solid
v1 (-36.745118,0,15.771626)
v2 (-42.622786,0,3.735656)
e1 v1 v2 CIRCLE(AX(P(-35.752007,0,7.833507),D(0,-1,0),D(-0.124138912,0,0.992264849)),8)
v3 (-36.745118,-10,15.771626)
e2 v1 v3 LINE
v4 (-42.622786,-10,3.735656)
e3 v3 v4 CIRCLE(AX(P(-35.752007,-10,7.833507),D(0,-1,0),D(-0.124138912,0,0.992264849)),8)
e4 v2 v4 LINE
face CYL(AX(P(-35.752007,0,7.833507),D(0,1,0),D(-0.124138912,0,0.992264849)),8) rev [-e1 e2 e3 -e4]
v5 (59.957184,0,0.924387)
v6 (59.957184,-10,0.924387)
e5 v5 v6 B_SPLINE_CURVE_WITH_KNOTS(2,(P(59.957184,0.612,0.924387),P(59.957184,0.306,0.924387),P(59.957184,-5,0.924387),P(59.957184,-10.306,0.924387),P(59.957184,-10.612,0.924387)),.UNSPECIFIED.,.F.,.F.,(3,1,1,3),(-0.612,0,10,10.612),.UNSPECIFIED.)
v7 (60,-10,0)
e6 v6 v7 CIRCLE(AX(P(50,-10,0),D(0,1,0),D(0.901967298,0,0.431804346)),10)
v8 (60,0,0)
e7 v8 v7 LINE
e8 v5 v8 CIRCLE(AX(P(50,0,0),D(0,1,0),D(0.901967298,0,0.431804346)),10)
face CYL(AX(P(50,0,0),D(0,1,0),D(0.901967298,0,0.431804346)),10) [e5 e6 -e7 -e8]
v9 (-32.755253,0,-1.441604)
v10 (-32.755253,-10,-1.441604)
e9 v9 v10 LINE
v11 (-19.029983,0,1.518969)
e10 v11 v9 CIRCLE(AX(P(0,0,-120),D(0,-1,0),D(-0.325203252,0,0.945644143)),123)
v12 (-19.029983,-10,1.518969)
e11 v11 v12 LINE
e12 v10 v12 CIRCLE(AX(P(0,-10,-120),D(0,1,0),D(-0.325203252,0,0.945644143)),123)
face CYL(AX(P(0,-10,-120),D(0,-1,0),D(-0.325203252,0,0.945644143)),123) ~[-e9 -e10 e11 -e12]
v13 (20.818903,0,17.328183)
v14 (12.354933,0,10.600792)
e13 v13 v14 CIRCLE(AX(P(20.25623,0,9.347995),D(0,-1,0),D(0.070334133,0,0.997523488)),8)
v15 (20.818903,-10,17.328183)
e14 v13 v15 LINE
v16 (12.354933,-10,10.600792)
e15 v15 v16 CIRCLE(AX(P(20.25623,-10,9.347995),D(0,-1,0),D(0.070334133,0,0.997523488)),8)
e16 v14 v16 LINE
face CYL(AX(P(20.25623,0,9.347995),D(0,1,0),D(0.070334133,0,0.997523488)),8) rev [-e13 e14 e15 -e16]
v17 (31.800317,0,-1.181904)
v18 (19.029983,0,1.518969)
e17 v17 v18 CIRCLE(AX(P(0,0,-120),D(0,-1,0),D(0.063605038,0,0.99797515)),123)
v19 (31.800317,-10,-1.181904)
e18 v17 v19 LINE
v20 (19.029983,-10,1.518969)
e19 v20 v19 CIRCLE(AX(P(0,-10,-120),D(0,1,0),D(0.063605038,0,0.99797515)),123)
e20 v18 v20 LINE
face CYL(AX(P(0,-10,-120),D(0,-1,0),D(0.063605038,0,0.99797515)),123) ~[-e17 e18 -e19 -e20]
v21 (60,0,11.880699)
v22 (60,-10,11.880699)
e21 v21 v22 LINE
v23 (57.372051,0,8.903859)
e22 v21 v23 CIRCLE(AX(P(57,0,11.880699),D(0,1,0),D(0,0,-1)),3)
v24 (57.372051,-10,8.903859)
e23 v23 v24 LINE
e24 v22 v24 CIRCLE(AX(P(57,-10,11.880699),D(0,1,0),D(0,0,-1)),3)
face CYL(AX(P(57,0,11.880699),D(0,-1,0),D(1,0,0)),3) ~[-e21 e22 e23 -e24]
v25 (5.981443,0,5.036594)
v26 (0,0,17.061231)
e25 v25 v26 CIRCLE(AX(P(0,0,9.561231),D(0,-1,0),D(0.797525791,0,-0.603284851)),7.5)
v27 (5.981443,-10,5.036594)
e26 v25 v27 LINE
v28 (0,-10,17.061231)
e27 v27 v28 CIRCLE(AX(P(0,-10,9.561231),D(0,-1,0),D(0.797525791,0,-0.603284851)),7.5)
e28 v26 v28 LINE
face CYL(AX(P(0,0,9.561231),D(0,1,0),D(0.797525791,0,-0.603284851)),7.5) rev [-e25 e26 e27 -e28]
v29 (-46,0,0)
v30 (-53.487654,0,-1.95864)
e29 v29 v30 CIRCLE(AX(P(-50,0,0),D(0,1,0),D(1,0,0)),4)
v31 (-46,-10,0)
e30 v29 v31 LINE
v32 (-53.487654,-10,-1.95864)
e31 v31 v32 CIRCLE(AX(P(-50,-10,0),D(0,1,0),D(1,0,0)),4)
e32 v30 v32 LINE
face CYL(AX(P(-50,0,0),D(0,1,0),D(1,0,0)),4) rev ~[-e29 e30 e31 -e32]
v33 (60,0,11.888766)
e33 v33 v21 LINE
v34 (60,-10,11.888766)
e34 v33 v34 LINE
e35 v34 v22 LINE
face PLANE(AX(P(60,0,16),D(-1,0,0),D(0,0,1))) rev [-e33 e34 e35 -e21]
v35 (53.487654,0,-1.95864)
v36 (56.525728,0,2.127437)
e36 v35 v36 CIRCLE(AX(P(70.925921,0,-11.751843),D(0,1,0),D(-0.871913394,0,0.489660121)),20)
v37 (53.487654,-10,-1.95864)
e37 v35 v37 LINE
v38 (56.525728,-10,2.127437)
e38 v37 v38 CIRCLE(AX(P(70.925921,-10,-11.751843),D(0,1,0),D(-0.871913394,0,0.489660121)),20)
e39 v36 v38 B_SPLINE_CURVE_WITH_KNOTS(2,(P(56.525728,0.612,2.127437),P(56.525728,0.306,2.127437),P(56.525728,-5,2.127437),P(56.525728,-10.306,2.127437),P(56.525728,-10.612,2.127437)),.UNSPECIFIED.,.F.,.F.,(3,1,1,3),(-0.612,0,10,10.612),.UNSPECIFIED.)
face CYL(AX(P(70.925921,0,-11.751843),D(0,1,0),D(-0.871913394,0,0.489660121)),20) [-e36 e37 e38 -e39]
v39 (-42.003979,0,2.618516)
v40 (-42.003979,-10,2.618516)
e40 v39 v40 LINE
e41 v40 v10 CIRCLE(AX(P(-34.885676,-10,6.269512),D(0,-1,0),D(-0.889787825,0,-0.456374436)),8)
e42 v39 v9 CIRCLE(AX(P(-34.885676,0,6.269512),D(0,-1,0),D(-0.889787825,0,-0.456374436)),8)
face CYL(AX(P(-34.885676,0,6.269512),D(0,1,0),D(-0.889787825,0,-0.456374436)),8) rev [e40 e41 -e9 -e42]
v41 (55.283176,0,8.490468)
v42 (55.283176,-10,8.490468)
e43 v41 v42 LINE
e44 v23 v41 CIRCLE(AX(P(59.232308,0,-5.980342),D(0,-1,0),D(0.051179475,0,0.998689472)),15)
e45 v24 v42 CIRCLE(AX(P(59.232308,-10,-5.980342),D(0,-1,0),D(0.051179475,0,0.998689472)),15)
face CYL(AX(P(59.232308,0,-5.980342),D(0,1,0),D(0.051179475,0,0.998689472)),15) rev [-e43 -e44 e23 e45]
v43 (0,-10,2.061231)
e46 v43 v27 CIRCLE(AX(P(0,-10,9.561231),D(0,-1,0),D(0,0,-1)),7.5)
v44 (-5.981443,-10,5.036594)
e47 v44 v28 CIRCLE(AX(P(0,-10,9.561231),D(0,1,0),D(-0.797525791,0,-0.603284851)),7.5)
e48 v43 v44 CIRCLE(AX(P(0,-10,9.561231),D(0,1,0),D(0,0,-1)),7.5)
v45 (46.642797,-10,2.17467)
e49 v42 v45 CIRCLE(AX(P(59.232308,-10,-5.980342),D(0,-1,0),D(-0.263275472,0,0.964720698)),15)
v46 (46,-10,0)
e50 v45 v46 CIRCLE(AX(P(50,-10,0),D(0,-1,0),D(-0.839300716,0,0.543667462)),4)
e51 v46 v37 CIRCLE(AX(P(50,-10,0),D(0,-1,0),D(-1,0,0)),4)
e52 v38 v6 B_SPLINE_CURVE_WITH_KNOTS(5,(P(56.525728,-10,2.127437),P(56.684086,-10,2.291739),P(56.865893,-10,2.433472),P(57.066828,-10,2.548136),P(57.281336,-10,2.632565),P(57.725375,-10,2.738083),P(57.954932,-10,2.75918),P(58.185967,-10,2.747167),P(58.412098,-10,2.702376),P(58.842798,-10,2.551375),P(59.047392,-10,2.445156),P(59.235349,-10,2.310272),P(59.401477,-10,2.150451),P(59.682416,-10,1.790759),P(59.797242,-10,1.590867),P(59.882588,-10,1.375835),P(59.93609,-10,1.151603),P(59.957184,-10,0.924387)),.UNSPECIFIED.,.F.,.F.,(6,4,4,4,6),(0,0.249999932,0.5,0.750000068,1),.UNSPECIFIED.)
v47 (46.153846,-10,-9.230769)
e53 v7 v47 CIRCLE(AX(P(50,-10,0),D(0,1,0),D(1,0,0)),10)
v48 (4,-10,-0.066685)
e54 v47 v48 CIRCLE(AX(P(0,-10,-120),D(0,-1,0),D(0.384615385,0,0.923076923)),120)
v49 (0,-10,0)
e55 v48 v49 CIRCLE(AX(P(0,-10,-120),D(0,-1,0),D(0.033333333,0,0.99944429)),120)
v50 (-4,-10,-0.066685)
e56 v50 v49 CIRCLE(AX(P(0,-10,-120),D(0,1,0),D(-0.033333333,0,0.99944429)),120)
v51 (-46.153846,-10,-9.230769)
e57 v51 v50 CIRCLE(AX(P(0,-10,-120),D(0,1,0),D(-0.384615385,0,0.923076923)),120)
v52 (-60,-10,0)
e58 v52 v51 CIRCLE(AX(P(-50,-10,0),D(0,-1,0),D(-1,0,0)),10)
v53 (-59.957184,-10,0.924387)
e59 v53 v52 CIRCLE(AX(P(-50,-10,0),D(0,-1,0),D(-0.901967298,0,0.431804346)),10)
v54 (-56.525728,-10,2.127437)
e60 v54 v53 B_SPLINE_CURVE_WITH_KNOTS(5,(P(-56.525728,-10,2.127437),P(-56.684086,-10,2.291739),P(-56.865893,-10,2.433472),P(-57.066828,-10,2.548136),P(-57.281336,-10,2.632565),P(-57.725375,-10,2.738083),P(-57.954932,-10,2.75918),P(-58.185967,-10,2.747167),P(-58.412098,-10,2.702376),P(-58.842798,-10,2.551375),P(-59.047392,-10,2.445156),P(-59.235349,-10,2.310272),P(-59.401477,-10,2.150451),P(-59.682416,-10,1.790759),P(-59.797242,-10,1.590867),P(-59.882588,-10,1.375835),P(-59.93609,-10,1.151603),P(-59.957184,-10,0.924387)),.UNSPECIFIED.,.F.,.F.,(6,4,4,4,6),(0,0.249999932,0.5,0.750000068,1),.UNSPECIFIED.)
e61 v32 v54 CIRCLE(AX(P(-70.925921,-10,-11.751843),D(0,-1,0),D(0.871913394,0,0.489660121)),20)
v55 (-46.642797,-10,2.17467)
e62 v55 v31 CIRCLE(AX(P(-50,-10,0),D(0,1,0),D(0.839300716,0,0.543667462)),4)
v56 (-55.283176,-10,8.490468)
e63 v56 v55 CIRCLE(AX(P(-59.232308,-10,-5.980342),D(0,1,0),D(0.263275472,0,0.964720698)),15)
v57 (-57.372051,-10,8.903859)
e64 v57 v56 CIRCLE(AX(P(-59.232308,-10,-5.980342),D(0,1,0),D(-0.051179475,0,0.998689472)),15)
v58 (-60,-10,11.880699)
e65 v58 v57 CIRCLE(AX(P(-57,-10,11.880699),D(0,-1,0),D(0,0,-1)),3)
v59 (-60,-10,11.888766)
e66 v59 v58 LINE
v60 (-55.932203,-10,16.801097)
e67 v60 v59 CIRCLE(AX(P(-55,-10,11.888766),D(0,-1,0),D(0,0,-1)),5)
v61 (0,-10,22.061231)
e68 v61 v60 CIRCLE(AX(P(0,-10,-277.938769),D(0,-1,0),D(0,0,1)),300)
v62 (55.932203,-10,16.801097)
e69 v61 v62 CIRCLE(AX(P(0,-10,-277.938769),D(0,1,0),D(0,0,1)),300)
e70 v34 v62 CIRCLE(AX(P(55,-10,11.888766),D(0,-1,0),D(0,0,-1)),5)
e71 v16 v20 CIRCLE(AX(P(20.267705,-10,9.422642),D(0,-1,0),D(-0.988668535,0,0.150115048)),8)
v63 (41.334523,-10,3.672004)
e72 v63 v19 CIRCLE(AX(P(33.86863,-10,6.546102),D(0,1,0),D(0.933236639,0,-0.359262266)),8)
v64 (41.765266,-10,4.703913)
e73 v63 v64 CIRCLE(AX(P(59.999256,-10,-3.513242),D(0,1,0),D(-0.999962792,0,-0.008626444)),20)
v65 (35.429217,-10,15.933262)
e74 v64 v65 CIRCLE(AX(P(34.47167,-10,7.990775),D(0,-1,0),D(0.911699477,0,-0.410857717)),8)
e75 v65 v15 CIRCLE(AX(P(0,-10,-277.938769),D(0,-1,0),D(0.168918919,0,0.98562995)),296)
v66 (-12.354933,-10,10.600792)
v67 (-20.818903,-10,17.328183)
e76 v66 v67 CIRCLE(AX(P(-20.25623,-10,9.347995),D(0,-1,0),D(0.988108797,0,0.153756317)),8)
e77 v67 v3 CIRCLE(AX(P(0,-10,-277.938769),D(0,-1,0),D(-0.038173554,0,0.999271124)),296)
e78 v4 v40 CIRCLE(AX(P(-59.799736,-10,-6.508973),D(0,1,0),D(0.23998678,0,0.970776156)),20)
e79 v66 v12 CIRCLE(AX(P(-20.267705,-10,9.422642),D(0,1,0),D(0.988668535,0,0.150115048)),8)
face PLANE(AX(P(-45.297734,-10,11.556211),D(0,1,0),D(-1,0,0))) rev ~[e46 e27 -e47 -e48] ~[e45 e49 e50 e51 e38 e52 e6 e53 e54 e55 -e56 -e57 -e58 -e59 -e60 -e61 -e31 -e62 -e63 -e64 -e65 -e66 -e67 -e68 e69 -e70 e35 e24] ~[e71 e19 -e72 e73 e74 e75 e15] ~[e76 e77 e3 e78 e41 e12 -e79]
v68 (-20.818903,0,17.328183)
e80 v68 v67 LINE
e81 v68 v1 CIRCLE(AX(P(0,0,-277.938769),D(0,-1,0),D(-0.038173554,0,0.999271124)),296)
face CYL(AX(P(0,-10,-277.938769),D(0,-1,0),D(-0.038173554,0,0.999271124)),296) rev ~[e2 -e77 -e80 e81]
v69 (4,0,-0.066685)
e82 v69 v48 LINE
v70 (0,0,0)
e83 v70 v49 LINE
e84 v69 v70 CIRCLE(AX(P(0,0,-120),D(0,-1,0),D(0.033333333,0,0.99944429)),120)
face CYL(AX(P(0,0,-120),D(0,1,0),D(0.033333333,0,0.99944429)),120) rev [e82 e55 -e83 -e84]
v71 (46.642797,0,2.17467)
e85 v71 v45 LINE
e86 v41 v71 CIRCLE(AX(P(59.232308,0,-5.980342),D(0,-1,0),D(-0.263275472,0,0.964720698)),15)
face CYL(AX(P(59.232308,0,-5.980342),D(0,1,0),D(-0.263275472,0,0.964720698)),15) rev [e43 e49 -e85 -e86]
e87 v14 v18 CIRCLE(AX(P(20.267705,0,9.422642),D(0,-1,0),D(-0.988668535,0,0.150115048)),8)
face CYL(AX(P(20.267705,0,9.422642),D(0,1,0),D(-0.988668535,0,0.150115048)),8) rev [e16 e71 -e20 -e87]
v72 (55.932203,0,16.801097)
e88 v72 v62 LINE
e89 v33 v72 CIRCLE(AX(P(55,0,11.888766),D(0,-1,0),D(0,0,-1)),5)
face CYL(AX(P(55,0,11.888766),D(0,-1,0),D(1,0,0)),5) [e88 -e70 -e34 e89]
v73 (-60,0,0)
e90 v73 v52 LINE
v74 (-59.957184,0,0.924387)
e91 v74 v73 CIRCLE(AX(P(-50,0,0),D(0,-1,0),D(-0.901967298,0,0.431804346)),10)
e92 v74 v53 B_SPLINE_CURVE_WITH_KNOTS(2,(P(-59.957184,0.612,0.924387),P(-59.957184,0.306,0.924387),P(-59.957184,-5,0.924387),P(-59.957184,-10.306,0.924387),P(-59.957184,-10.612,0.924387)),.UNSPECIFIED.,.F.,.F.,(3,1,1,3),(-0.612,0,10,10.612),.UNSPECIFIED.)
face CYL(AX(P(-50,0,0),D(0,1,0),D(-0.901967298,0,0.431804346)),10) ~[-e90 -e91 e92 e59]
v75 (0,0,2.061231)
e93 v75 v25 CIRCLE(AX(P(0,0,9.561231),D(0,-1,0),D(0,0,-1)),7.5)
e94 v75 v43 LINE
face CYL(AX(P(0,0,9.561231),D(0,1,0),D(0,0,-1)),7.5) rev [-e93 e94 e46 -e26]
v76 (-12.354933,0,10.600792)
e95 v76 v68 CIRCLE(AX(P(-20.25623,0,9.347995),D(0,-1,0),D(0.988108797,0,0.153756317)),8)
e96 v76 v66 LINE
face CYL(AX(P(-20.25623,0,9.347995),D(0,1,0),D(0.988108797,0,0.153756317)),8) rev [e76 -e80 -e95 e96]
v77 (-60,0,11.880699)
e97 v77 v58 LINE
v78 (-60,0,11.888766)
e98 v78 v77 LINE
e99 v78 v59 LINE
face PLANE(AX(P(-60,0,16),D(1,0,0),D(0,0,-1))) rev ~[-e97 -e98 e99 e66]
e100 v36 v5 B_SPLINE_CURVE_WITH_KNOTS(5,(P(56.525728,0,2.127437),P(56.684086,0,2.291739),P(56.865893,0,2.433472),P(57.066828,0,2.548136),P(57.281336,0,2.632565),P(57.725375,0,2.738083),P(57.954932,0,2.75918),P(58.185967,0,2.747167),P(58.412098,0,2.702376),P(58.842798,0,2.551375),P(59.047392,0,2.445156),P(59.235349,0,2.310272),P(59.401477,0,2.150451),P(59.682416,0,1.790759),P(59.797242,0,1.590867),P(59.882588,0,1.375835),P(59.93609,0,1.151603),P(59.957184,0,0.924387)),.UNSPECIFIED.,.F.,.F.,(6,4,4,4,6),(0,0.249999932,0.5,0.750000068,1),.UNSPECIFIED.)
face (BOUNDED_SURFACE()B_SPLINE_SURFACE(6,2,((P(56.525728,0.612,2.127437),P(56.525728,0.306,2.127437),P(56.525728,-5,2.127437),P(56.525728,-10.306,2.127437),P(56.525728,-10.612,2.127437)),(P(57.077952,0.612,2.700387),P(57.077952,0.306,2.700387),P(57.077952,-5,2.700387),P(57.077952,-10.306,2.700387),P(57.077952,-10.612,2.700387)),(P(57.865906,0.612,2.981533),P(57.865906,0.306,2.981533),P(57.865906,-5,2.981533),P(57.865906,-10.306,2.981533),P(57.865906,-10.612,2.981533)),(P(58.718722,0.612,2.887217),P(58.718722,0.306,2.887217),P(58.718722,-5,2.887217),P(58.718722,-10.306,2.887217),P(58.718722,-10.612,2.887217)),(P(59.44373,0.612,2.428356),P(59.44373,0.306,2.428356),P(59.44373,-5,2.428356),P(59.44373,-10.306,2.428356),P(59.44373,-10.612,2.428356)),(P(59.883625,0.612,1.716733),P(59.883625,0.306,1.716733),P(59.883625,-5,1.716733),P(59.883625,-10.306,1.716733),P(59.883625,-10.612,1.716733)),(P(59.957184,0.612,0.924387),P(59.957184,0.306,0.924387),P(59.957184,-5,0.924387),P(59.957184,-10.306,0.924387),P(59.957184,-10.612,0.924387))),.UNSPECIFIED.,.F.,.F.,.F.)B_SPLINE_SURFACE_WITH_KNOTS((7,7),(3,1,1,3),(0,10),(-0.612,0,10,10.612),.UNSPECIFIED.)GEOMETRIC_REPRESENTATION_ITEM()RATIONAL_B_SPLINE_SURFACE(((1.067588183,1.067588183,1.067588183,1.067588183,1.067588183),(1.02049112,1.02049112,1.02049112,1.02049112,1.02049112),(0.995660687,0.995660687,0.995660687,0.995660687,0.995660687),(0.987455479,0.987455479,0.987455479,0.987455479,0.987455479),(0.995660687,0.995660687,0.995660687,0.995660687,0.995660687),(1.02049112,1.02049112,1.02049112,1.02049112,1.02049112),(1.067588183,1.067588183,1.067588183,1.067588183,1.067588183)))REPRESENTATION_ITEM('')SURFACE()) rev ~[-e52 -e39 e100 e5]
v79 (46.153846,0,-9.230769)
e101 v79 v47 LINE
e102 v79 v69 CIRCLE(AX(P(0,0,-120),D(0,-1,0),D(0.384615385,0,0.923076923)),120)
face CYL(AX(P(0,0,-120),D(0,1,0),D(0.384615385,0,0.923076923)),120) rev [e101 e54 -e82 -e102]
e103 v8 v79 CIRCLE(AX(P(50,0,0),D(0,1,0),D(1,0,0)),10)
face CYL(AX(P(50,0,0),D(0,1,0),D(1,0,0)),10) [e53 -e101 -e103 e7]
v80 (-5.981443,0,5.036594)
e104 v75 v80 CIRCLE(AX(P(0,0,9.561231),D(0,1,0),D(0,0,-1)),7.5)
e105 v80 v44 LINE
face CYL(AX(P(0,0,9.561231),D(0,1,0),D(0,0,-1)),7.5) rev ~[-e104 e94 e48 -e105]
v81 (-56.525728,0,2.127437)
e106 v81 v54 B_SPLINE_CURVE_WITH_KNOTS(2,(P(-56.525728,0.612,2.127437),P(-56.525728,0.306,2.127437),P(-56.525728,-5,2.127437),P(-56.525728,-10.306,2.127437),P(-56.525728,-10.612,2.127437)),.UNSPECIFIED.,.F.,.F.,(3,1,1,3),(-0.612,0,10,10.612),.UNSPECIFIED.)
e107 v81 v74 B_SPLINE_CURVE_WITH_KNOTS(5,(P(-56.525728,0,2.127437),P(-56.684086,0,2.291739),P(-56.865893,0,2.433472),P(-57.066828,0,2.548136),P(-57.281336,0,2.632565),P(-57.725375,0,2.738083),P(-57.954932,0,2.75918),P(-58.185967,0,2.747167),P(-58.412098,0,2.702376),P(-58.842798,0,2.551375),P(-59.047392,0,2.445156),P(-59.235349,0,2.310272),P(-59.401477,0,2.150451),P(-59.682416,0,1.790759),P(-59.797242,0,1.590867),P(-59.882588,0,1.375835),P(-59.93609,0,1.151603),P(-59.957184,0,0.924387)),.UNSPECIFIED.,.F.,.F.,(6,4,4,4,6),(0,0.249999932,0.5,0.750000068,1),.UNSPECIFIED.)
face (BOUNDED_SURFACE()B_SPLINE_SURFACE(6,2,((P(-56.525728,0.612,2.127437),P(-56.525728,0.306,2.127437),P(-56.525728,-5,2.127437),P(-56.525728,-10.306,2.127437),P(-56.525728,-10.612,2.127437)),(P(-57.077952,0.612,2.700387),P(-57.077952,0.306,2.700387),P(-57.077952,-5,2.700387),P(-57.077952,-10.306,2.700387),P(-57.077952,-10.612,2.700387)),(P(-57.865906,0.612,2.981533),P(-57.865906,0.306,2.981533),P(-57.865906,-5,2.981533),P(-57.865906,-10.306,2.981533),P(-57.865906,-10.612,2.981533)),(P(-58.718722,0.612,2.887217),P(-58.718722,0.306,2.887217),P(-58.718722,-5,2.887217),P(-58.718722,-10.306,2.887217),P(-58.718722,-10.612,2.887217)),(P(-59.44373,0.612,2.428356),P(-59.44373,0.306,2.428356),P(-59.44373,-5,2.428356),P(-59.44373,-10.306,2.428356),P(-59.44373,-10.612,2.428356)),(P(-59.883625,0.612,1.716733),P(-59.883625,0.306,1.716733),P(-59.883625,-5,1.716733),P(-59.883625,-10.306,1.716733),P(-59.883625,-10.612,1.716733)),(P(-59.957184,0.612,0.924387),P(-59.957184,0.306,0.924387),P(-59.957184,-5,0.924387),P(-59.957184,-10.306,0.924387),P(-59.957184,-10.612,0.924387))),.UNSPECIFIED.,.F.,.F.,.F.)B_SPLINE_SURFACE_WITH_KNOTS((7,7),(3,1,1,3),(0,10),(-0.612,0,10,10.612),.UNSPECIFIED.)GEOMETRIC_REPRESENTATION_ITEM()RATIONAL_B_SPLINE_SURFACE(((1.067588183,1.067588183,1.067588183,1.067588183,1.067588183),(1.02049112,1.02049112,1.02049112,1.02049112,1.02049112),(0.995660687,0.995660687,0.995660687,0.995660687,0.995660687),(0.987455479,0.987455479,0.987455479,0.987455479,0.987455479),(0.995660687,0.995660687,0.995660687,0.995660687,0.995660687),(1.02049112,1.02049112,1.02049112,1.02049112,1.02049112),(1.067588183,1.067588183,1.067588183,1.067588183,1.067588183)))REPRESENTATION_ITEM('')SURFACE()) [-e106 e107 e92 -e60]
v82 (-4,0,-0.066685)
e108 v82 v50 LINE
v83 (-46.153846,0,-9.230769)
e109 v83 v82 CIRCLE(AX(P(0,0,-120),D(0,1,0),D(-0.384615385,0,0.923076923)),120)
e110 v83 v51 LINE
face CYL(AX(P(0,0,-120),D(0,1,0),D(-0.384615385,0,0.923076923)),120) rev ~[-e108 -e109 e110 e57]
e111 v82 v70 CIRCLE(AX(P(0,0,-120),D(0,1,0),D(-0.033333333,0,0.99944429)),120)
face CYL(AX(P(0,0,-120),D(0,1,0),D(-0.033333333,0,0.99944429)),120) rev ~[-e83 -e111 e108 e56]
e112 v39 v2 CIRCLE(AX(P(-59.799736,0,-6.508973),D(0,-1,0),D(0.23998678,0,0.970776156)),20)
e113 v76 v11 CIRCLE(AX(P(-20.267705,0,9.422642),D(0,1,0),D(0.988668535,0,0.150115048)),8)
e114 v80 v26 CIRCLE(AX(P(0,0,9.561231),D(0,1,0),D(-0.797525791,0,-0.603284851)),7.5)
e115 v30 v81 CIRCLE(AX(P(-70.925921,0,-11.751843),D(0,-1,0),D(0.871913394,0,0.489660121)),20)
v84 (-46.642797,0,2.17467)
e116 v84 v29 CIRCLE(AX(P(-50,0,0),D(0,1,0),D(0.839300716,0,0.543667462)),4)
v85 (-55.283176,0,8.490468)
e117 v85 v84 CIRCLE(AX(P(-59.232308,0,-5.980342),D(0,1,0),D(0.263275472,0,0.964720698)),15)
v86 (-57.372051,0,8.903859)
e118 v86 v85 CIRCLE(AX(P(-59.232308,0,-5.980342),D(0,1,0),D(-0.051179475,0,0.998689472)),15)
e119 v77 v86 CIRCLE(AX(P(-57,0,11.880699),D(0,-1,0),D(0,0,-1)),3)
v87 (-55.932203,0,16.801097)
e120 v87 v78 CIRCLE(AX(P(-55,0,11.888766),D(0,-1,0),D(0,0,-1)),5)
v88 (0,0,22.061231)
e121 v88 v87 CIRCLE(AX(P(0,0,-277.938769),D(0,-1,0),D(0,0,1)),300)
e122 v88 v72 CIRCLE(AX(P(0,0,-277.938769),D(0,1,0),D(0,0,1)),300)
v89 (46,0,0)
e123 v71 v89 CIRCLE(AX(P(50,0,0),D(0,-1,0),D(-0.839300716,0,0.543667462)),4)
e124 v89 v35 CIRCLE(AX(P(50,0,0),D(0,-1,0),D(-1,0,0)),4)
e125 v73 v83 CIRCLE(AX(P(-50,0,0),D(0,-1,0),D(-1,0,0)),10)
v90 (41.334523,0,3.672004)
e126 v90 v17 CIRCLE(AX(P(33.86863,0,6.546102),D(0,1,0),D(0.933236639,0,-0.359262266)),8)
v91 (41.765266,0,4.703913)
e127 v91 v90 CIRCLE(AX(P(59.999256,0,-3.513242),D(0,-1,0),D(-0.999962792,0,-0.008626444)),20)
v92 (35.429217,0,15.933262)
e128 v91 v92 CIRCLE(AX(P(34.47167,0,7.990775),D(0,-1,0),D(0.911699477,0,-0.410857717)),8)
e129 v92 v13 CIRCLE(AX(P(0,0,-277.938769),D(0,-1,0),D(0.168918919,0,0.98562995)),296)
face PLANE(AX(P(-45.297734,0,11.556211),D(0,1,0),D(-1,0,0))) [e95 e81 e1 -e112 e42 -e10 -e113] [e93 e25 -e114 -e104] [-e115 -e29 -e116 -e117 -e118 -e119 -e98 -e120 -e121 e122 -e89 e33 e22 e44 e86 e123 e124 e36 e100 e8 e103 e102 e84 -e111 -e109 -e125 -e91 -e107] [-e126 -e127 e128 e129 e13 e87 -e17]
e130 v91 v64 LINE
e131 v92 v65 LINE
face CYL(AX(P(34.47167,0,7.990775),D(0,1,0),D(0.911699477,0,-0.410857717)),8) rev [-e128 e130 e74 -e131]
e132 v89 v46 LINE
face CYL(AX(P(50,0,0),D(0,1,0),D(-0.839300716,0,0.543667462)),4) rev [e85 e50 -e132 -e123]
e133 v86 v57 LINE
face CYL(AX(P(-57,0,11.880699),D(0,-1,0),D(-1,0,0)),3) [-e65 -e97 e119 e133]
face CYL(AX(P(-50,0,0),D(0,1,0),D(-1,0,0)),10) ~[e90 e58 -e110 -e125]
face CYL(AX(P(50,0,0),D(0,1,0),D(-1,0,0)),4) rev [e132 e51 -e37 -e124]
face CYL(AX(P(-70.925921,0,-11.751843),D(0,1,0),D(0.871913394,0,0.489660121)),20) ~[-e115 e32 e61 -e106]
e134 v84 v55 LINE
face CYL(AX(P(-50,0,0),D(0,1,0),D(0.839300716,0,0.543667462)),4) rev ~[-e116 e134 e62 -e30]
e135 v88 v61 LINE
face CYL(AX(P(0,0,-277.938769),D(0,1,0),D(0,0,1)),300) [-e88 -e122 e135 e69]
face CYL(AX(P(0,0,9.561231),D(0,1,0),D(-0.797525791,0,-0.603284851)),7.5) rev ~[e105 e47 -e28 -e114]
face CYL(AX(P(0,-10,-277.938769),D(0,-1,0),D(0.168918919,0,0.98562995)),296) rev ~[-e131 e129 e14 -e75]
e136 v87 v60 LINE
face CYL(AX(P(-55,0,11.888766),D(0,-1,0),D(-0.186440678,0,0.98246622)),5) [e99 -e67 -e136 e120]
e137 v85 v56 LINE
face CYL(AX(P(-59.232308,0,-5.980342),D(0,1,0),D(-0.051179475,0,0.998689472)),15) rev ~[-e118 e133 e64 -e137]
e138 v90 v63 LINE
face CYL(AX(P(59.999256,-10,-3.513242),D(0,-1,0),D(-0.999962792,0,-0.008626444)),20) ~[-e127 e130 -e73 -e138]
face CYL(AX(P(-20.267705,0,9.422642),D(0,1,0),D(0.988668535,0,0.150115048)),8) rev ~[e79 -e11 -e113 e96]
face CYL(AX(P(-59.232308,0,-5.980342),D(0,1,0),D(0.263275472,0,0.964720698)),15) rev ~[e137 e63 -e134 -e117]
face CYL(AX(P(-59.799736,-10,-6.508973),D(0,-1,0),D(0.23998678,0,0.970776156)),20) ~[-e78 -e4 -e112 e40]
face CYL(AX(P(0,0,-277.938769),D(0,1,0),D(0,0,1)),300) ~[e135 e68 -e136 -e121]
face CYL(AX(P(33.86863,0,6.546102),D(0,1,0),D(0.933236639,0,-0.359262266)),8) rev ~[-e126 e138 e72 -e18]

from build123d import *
from build123d import SkipClean  # not in build123d's __all__

# Parameters (mm, degrees)
F1_DEPTH    = 10
F3_R        = 5
F4_R        = 3
F5_R        = 2
F7_DEPTH    = 10.0010001
F8_T1_DEPTH = 10


# Not quite as in the source:
# - a fillet or chamfer that OpenCascade refuses, or shapes differently, is made with other operations: its cross-section is extruded or revolved along the edge and cut away or added


with BuildPart() as f1:
    # F0 (on Front) → F1 (new body)
    with BuildSketch(Plane.XZ):
        with BuildLine():
            ThreePointArc((-60, 9), (-57.6213157363, 8.9328971517), (-55.2831757887, 8.4904683961))
            ThreePointArc((-55.2831757887, 8.4904683961), (-45.1436514688, 8.7416176388), (-40, 0))
            ThreePointArc((-40, 0), (-41.6794970566, -5.5470019623), (-46.1538461538, -9.2307692308))
            ThreePointArc((-46.1538461538, -9.2307692308), (-25.4921003461, -2.7389543798), (-4, -0.0666851955))
            ThreePointArc((-4, -0.0666851955), (-4.6347028183, 2.6231856146), (-5.9814434357, 5.03659448))
            ThreePointArc((-5.9814434357, 5.03659448), (-6.715086481, 12.9015322824), (0, 17.061230866))
            Line((0, 17.061230866), (0, 22.061230866))
            ThreePointArc((0, 22.061230866), (-30.1526886016, 20.5420767676), (-60, 16))
            Line((-60, 16), (-60, 9))
        make_face()
        with BuildLine():
            ThreePointArc((-46.6427971379, 2.1746698468), (-46.1640639051, 1.1338404984), (-46, 0))
            ThreePointArc((-46, 0), (-48.9877288652, -3.8697941999), (-53.4876535749, -1.958640483))
            ThreePointArc((-53.4876535749, -1.958640483), (-55.921777017, 1.4722128283), (-59.0196729824, 4.3180434563))
            ThreePointArc((-59.0196729824, 4.3180434563), (-59.7518390528, 2.21396366), (-60, 0))
            ThreePointArc((-60, 0), (-55.5470019623, -8.3205029434), (-46.1538461538, -9.2307692308))
            ThreePointArc((-46.1538461538, -9.2307692308), (-41.6794970566, -5.5470019623), (-40, 0))
            ThreePointArc((-40, 0), (-45.1436514688, 8.7416176388), (-55.2831757887, 8.4904683961))
            ThreePointArc((-55.2831757887, 8.4904683961), (-50.3805281419, 6.1294058803), (-46.6427971379, 2.1746698468))
        make_face()
        with BuildLine():
            ThreePointArc((-5.9814434357, 5.03659448), (-4.6347028183, 2.6231856146), (-4, -0.0666851955))
            ThreePointArc((-4, -0.0666851955), (-2.0002779129, -0.0166724571), (0, 0))
            Line((0, 0), (0, 2.061230866))
            ThreePointArc((0, 2.061230866), (-3.3403014164, 2.846144385), (-5.9814434357, 5.03659448))
        make_face()
    extrude(amount=F1_DEPTH)

    # F2: F1 across plane


with BuildPart() as f1_1:
    add(f1.part, clean=False)
    with SkipClean():  # cleaning this boolean's faces spoils the solid; the shape is the same uncleaned
        add(f1.part.mirror(Plane.YZ), clean=False)

    # F3
    f3_edges = [f1_1.edges().sort_by_distance(p)[0] for p in [
        (-60, -5, 16),
        (60, -5, 16),
    ]]
    fillet(f3_edges, radius=F3_R)

    # F4
    f4_edges = [f1_1.edges().sort_by_distance(p)[0] for p in [
        (-60, -5, 9),
        (60, -5, 9),
    ]]
    fillet(f4_edges, radius=F4_R)

    # F5
    f5_edges = [f1_1.edges().sort_by_distance(p)[0] for p in [
        (-59.019673, -5, 4.318043),
        (59.019673, -5, 4.318043),
    ]]
    fillet(f5_edges, radius=F5_R)

    # F6 (on face) → F7 (cut, through all)
    with BuildSketch(Plane.XZ.offset(10)):
        with BuildLine():
            ThreePointArc((-7.8234196702, 2.7509433962), (-12.1811976175, 9.6949287705), (-11.2993718648, 17.8454836508))
            ThreePointArc((-11.2993718648, 17.8454836508), (-33.2415394106, 16.1887543276), (-55, 12.9065505808))
            ThreePointArc((-55, 12.9065505808), (-44.9636385736, 6.903343626), (-40, -3.685770432))
            ThreePointArc((-40, -3.685770432), (-24.1273224471, 0.6104154355), (-7.8234196702, 2.7509433962))
        make_face()
        with BuildLine():
            ThreePointArc((40, -3.685770432), (42.6359894717, 6.412330531), (50, 13.8076961402))
            ThreePointArc((50, 13.8076961402), (30.7161061945, 16.4632023612), (11.2993718648, 17.8454836508))
            ThreePointArc((11.2993718648, 17.8454836508), (12.1961499726, 15.2393294517), (12.5, 12.5))
            ThreePointArc((12.5, 12.5), (11.2703759005, 7.0936493768), (7.8234196702, 2.7509433962))
            ThreePointArc((7.8234196702, 2.7509433962), (24.1273224471, 0.6104154355), (40, -3.685770432))
        make_face()
    extrude(amount=-F7_DEPTH, mode=Mode.SUBTRACT)

    # F8: fillet of radius 8 on 8 edges, made by hand

    # F8_s2 → F8_t1 (join)
    with BuildSketch(Plane.XZ):
        with BuildLine():
            ThreePointArc((-36.7451179027, 15.7716261712), (-42.9406323526, 11.3440144515), (-42.6227863201, 3.7356559729))
            ThreePointArc((-42.6227863201, 3.7356559729), (-47.8930149535, 9.5605639606), (-55, 12.9065505808))
            ThreePointArc((-55, 12.9065505808), (-45.8949216066, 14.4815724477), (-36.7451179027, 15.7716261712))
        make_face()
        with BuildLine():
            ThreePointArc((-42.0039790926, 2.6185161763), (-38.1014001727, -1.0557269801), (-32.7552534978, -1.4416035521))
            ThreePointArc((-32.7552534978, -1.4416035521), (-36.3949282061, -2.5078334489), (-40, -3.685770432))
            ThreePointArc((-40, -3.685770432), (-40.7395345489, -0.4501990795), (-42.0039790926, 2.6185161763))
        make_face()
        with BuildLine():
            ThreePointArc((-12.3583566886, 10.623561896), (-13.8147498473, 4.6940719377), (-19.0299825284, 1.5189687455))
            ThreePointArc((-19.0299825284, 1.5189687455), (-13.4408237395, 2.2634215831), (-7.8234196702, 2.7509433962))
            ThreePointArc((-7.8234196702, 2.7509433962), (-10.83146134, 6.2606534605), (-12.3583566886, 10.623561896))
        make_face()
        with BuildLine():
            ThreePointArc((-12.3513599638, 10.578046035), (-15.2694424, 15.6035487131), (-20.8189034057, 17.3281834039))
            ThreePointArc((-20.8189034057, 17.3281834039), (-16.0612204229, 17.6251616805), (-11.2993718648, 17.8454836508))
            ThreePointArc((-11.2993718648, 17.8454836508), (-12.3710626618, 14.2907564373), (-12.3513599638, 10.578046035))
        make_face()
        with BuildLine():
            ThreePointArc((20.8189034057, 17.3281834039), (15.2694424, 15.6035487131), (12.3513599638, 10.578046035))
            ThreePointArc((12.3513599638, 10.578046035), (12.3710626618, 14.2907564373), (11.2993718648, 17.8454836508))
            ThreePointArc((11.2993718648, 17.8454836508), (16.0612204229, 17.6251616805), (20.8189034057, 17.3281834039))
        make_face()
        with BuildLine():
            ThreePointArc((12.3583566886, 10.623561896), (13.8147498473, 4.6940719377), (19.0299825284, 1.5189687455))
            ThreePointArc((19.0299825284, 1.5189687455), (13.4408237395, 2.2634215831), (7.8234196702, 2.7509433962))
            ThreePointArc((7.8234196702, 2.7509433962), (10.83146134, 6.2606534605), (12.3583566886, 10.623561896))
        make_face()
        with BuildLine():
            ThreePointArc((41.7652662923, 4.7039127832), (41.4390880083, 11.9220711187), (35.429216879, 15.9332618444))
            ThreePointArc((35.429216879, 15.9332618444), (42.7278279524, 14.9610989412), (50, 13.8076961402))
            ThreePointArc((50, 13.8076961402), (45.1669008636, 9.9032127448), (41.7652662923, 4.7039127832))
        make_face()
        with BuildLine():
            ThreePointArc((41.3345230553, 3.6720037672), (37.4981716447, -0.5831636355), (31.800316666, -1.1819043245))
            ThreePointArc((31.800316666, -1.1819043245), (35.9219808015, -2.3623729613), (40, -3.685770432))
            ThreePointArc((40, -3.685770432), (40.3203276581, 0.056042117), (41.3345230553, 3.6720037672))
        make_face()
    extrude(amount=F8_T1_DEPTH)


solid = f1_1.part
